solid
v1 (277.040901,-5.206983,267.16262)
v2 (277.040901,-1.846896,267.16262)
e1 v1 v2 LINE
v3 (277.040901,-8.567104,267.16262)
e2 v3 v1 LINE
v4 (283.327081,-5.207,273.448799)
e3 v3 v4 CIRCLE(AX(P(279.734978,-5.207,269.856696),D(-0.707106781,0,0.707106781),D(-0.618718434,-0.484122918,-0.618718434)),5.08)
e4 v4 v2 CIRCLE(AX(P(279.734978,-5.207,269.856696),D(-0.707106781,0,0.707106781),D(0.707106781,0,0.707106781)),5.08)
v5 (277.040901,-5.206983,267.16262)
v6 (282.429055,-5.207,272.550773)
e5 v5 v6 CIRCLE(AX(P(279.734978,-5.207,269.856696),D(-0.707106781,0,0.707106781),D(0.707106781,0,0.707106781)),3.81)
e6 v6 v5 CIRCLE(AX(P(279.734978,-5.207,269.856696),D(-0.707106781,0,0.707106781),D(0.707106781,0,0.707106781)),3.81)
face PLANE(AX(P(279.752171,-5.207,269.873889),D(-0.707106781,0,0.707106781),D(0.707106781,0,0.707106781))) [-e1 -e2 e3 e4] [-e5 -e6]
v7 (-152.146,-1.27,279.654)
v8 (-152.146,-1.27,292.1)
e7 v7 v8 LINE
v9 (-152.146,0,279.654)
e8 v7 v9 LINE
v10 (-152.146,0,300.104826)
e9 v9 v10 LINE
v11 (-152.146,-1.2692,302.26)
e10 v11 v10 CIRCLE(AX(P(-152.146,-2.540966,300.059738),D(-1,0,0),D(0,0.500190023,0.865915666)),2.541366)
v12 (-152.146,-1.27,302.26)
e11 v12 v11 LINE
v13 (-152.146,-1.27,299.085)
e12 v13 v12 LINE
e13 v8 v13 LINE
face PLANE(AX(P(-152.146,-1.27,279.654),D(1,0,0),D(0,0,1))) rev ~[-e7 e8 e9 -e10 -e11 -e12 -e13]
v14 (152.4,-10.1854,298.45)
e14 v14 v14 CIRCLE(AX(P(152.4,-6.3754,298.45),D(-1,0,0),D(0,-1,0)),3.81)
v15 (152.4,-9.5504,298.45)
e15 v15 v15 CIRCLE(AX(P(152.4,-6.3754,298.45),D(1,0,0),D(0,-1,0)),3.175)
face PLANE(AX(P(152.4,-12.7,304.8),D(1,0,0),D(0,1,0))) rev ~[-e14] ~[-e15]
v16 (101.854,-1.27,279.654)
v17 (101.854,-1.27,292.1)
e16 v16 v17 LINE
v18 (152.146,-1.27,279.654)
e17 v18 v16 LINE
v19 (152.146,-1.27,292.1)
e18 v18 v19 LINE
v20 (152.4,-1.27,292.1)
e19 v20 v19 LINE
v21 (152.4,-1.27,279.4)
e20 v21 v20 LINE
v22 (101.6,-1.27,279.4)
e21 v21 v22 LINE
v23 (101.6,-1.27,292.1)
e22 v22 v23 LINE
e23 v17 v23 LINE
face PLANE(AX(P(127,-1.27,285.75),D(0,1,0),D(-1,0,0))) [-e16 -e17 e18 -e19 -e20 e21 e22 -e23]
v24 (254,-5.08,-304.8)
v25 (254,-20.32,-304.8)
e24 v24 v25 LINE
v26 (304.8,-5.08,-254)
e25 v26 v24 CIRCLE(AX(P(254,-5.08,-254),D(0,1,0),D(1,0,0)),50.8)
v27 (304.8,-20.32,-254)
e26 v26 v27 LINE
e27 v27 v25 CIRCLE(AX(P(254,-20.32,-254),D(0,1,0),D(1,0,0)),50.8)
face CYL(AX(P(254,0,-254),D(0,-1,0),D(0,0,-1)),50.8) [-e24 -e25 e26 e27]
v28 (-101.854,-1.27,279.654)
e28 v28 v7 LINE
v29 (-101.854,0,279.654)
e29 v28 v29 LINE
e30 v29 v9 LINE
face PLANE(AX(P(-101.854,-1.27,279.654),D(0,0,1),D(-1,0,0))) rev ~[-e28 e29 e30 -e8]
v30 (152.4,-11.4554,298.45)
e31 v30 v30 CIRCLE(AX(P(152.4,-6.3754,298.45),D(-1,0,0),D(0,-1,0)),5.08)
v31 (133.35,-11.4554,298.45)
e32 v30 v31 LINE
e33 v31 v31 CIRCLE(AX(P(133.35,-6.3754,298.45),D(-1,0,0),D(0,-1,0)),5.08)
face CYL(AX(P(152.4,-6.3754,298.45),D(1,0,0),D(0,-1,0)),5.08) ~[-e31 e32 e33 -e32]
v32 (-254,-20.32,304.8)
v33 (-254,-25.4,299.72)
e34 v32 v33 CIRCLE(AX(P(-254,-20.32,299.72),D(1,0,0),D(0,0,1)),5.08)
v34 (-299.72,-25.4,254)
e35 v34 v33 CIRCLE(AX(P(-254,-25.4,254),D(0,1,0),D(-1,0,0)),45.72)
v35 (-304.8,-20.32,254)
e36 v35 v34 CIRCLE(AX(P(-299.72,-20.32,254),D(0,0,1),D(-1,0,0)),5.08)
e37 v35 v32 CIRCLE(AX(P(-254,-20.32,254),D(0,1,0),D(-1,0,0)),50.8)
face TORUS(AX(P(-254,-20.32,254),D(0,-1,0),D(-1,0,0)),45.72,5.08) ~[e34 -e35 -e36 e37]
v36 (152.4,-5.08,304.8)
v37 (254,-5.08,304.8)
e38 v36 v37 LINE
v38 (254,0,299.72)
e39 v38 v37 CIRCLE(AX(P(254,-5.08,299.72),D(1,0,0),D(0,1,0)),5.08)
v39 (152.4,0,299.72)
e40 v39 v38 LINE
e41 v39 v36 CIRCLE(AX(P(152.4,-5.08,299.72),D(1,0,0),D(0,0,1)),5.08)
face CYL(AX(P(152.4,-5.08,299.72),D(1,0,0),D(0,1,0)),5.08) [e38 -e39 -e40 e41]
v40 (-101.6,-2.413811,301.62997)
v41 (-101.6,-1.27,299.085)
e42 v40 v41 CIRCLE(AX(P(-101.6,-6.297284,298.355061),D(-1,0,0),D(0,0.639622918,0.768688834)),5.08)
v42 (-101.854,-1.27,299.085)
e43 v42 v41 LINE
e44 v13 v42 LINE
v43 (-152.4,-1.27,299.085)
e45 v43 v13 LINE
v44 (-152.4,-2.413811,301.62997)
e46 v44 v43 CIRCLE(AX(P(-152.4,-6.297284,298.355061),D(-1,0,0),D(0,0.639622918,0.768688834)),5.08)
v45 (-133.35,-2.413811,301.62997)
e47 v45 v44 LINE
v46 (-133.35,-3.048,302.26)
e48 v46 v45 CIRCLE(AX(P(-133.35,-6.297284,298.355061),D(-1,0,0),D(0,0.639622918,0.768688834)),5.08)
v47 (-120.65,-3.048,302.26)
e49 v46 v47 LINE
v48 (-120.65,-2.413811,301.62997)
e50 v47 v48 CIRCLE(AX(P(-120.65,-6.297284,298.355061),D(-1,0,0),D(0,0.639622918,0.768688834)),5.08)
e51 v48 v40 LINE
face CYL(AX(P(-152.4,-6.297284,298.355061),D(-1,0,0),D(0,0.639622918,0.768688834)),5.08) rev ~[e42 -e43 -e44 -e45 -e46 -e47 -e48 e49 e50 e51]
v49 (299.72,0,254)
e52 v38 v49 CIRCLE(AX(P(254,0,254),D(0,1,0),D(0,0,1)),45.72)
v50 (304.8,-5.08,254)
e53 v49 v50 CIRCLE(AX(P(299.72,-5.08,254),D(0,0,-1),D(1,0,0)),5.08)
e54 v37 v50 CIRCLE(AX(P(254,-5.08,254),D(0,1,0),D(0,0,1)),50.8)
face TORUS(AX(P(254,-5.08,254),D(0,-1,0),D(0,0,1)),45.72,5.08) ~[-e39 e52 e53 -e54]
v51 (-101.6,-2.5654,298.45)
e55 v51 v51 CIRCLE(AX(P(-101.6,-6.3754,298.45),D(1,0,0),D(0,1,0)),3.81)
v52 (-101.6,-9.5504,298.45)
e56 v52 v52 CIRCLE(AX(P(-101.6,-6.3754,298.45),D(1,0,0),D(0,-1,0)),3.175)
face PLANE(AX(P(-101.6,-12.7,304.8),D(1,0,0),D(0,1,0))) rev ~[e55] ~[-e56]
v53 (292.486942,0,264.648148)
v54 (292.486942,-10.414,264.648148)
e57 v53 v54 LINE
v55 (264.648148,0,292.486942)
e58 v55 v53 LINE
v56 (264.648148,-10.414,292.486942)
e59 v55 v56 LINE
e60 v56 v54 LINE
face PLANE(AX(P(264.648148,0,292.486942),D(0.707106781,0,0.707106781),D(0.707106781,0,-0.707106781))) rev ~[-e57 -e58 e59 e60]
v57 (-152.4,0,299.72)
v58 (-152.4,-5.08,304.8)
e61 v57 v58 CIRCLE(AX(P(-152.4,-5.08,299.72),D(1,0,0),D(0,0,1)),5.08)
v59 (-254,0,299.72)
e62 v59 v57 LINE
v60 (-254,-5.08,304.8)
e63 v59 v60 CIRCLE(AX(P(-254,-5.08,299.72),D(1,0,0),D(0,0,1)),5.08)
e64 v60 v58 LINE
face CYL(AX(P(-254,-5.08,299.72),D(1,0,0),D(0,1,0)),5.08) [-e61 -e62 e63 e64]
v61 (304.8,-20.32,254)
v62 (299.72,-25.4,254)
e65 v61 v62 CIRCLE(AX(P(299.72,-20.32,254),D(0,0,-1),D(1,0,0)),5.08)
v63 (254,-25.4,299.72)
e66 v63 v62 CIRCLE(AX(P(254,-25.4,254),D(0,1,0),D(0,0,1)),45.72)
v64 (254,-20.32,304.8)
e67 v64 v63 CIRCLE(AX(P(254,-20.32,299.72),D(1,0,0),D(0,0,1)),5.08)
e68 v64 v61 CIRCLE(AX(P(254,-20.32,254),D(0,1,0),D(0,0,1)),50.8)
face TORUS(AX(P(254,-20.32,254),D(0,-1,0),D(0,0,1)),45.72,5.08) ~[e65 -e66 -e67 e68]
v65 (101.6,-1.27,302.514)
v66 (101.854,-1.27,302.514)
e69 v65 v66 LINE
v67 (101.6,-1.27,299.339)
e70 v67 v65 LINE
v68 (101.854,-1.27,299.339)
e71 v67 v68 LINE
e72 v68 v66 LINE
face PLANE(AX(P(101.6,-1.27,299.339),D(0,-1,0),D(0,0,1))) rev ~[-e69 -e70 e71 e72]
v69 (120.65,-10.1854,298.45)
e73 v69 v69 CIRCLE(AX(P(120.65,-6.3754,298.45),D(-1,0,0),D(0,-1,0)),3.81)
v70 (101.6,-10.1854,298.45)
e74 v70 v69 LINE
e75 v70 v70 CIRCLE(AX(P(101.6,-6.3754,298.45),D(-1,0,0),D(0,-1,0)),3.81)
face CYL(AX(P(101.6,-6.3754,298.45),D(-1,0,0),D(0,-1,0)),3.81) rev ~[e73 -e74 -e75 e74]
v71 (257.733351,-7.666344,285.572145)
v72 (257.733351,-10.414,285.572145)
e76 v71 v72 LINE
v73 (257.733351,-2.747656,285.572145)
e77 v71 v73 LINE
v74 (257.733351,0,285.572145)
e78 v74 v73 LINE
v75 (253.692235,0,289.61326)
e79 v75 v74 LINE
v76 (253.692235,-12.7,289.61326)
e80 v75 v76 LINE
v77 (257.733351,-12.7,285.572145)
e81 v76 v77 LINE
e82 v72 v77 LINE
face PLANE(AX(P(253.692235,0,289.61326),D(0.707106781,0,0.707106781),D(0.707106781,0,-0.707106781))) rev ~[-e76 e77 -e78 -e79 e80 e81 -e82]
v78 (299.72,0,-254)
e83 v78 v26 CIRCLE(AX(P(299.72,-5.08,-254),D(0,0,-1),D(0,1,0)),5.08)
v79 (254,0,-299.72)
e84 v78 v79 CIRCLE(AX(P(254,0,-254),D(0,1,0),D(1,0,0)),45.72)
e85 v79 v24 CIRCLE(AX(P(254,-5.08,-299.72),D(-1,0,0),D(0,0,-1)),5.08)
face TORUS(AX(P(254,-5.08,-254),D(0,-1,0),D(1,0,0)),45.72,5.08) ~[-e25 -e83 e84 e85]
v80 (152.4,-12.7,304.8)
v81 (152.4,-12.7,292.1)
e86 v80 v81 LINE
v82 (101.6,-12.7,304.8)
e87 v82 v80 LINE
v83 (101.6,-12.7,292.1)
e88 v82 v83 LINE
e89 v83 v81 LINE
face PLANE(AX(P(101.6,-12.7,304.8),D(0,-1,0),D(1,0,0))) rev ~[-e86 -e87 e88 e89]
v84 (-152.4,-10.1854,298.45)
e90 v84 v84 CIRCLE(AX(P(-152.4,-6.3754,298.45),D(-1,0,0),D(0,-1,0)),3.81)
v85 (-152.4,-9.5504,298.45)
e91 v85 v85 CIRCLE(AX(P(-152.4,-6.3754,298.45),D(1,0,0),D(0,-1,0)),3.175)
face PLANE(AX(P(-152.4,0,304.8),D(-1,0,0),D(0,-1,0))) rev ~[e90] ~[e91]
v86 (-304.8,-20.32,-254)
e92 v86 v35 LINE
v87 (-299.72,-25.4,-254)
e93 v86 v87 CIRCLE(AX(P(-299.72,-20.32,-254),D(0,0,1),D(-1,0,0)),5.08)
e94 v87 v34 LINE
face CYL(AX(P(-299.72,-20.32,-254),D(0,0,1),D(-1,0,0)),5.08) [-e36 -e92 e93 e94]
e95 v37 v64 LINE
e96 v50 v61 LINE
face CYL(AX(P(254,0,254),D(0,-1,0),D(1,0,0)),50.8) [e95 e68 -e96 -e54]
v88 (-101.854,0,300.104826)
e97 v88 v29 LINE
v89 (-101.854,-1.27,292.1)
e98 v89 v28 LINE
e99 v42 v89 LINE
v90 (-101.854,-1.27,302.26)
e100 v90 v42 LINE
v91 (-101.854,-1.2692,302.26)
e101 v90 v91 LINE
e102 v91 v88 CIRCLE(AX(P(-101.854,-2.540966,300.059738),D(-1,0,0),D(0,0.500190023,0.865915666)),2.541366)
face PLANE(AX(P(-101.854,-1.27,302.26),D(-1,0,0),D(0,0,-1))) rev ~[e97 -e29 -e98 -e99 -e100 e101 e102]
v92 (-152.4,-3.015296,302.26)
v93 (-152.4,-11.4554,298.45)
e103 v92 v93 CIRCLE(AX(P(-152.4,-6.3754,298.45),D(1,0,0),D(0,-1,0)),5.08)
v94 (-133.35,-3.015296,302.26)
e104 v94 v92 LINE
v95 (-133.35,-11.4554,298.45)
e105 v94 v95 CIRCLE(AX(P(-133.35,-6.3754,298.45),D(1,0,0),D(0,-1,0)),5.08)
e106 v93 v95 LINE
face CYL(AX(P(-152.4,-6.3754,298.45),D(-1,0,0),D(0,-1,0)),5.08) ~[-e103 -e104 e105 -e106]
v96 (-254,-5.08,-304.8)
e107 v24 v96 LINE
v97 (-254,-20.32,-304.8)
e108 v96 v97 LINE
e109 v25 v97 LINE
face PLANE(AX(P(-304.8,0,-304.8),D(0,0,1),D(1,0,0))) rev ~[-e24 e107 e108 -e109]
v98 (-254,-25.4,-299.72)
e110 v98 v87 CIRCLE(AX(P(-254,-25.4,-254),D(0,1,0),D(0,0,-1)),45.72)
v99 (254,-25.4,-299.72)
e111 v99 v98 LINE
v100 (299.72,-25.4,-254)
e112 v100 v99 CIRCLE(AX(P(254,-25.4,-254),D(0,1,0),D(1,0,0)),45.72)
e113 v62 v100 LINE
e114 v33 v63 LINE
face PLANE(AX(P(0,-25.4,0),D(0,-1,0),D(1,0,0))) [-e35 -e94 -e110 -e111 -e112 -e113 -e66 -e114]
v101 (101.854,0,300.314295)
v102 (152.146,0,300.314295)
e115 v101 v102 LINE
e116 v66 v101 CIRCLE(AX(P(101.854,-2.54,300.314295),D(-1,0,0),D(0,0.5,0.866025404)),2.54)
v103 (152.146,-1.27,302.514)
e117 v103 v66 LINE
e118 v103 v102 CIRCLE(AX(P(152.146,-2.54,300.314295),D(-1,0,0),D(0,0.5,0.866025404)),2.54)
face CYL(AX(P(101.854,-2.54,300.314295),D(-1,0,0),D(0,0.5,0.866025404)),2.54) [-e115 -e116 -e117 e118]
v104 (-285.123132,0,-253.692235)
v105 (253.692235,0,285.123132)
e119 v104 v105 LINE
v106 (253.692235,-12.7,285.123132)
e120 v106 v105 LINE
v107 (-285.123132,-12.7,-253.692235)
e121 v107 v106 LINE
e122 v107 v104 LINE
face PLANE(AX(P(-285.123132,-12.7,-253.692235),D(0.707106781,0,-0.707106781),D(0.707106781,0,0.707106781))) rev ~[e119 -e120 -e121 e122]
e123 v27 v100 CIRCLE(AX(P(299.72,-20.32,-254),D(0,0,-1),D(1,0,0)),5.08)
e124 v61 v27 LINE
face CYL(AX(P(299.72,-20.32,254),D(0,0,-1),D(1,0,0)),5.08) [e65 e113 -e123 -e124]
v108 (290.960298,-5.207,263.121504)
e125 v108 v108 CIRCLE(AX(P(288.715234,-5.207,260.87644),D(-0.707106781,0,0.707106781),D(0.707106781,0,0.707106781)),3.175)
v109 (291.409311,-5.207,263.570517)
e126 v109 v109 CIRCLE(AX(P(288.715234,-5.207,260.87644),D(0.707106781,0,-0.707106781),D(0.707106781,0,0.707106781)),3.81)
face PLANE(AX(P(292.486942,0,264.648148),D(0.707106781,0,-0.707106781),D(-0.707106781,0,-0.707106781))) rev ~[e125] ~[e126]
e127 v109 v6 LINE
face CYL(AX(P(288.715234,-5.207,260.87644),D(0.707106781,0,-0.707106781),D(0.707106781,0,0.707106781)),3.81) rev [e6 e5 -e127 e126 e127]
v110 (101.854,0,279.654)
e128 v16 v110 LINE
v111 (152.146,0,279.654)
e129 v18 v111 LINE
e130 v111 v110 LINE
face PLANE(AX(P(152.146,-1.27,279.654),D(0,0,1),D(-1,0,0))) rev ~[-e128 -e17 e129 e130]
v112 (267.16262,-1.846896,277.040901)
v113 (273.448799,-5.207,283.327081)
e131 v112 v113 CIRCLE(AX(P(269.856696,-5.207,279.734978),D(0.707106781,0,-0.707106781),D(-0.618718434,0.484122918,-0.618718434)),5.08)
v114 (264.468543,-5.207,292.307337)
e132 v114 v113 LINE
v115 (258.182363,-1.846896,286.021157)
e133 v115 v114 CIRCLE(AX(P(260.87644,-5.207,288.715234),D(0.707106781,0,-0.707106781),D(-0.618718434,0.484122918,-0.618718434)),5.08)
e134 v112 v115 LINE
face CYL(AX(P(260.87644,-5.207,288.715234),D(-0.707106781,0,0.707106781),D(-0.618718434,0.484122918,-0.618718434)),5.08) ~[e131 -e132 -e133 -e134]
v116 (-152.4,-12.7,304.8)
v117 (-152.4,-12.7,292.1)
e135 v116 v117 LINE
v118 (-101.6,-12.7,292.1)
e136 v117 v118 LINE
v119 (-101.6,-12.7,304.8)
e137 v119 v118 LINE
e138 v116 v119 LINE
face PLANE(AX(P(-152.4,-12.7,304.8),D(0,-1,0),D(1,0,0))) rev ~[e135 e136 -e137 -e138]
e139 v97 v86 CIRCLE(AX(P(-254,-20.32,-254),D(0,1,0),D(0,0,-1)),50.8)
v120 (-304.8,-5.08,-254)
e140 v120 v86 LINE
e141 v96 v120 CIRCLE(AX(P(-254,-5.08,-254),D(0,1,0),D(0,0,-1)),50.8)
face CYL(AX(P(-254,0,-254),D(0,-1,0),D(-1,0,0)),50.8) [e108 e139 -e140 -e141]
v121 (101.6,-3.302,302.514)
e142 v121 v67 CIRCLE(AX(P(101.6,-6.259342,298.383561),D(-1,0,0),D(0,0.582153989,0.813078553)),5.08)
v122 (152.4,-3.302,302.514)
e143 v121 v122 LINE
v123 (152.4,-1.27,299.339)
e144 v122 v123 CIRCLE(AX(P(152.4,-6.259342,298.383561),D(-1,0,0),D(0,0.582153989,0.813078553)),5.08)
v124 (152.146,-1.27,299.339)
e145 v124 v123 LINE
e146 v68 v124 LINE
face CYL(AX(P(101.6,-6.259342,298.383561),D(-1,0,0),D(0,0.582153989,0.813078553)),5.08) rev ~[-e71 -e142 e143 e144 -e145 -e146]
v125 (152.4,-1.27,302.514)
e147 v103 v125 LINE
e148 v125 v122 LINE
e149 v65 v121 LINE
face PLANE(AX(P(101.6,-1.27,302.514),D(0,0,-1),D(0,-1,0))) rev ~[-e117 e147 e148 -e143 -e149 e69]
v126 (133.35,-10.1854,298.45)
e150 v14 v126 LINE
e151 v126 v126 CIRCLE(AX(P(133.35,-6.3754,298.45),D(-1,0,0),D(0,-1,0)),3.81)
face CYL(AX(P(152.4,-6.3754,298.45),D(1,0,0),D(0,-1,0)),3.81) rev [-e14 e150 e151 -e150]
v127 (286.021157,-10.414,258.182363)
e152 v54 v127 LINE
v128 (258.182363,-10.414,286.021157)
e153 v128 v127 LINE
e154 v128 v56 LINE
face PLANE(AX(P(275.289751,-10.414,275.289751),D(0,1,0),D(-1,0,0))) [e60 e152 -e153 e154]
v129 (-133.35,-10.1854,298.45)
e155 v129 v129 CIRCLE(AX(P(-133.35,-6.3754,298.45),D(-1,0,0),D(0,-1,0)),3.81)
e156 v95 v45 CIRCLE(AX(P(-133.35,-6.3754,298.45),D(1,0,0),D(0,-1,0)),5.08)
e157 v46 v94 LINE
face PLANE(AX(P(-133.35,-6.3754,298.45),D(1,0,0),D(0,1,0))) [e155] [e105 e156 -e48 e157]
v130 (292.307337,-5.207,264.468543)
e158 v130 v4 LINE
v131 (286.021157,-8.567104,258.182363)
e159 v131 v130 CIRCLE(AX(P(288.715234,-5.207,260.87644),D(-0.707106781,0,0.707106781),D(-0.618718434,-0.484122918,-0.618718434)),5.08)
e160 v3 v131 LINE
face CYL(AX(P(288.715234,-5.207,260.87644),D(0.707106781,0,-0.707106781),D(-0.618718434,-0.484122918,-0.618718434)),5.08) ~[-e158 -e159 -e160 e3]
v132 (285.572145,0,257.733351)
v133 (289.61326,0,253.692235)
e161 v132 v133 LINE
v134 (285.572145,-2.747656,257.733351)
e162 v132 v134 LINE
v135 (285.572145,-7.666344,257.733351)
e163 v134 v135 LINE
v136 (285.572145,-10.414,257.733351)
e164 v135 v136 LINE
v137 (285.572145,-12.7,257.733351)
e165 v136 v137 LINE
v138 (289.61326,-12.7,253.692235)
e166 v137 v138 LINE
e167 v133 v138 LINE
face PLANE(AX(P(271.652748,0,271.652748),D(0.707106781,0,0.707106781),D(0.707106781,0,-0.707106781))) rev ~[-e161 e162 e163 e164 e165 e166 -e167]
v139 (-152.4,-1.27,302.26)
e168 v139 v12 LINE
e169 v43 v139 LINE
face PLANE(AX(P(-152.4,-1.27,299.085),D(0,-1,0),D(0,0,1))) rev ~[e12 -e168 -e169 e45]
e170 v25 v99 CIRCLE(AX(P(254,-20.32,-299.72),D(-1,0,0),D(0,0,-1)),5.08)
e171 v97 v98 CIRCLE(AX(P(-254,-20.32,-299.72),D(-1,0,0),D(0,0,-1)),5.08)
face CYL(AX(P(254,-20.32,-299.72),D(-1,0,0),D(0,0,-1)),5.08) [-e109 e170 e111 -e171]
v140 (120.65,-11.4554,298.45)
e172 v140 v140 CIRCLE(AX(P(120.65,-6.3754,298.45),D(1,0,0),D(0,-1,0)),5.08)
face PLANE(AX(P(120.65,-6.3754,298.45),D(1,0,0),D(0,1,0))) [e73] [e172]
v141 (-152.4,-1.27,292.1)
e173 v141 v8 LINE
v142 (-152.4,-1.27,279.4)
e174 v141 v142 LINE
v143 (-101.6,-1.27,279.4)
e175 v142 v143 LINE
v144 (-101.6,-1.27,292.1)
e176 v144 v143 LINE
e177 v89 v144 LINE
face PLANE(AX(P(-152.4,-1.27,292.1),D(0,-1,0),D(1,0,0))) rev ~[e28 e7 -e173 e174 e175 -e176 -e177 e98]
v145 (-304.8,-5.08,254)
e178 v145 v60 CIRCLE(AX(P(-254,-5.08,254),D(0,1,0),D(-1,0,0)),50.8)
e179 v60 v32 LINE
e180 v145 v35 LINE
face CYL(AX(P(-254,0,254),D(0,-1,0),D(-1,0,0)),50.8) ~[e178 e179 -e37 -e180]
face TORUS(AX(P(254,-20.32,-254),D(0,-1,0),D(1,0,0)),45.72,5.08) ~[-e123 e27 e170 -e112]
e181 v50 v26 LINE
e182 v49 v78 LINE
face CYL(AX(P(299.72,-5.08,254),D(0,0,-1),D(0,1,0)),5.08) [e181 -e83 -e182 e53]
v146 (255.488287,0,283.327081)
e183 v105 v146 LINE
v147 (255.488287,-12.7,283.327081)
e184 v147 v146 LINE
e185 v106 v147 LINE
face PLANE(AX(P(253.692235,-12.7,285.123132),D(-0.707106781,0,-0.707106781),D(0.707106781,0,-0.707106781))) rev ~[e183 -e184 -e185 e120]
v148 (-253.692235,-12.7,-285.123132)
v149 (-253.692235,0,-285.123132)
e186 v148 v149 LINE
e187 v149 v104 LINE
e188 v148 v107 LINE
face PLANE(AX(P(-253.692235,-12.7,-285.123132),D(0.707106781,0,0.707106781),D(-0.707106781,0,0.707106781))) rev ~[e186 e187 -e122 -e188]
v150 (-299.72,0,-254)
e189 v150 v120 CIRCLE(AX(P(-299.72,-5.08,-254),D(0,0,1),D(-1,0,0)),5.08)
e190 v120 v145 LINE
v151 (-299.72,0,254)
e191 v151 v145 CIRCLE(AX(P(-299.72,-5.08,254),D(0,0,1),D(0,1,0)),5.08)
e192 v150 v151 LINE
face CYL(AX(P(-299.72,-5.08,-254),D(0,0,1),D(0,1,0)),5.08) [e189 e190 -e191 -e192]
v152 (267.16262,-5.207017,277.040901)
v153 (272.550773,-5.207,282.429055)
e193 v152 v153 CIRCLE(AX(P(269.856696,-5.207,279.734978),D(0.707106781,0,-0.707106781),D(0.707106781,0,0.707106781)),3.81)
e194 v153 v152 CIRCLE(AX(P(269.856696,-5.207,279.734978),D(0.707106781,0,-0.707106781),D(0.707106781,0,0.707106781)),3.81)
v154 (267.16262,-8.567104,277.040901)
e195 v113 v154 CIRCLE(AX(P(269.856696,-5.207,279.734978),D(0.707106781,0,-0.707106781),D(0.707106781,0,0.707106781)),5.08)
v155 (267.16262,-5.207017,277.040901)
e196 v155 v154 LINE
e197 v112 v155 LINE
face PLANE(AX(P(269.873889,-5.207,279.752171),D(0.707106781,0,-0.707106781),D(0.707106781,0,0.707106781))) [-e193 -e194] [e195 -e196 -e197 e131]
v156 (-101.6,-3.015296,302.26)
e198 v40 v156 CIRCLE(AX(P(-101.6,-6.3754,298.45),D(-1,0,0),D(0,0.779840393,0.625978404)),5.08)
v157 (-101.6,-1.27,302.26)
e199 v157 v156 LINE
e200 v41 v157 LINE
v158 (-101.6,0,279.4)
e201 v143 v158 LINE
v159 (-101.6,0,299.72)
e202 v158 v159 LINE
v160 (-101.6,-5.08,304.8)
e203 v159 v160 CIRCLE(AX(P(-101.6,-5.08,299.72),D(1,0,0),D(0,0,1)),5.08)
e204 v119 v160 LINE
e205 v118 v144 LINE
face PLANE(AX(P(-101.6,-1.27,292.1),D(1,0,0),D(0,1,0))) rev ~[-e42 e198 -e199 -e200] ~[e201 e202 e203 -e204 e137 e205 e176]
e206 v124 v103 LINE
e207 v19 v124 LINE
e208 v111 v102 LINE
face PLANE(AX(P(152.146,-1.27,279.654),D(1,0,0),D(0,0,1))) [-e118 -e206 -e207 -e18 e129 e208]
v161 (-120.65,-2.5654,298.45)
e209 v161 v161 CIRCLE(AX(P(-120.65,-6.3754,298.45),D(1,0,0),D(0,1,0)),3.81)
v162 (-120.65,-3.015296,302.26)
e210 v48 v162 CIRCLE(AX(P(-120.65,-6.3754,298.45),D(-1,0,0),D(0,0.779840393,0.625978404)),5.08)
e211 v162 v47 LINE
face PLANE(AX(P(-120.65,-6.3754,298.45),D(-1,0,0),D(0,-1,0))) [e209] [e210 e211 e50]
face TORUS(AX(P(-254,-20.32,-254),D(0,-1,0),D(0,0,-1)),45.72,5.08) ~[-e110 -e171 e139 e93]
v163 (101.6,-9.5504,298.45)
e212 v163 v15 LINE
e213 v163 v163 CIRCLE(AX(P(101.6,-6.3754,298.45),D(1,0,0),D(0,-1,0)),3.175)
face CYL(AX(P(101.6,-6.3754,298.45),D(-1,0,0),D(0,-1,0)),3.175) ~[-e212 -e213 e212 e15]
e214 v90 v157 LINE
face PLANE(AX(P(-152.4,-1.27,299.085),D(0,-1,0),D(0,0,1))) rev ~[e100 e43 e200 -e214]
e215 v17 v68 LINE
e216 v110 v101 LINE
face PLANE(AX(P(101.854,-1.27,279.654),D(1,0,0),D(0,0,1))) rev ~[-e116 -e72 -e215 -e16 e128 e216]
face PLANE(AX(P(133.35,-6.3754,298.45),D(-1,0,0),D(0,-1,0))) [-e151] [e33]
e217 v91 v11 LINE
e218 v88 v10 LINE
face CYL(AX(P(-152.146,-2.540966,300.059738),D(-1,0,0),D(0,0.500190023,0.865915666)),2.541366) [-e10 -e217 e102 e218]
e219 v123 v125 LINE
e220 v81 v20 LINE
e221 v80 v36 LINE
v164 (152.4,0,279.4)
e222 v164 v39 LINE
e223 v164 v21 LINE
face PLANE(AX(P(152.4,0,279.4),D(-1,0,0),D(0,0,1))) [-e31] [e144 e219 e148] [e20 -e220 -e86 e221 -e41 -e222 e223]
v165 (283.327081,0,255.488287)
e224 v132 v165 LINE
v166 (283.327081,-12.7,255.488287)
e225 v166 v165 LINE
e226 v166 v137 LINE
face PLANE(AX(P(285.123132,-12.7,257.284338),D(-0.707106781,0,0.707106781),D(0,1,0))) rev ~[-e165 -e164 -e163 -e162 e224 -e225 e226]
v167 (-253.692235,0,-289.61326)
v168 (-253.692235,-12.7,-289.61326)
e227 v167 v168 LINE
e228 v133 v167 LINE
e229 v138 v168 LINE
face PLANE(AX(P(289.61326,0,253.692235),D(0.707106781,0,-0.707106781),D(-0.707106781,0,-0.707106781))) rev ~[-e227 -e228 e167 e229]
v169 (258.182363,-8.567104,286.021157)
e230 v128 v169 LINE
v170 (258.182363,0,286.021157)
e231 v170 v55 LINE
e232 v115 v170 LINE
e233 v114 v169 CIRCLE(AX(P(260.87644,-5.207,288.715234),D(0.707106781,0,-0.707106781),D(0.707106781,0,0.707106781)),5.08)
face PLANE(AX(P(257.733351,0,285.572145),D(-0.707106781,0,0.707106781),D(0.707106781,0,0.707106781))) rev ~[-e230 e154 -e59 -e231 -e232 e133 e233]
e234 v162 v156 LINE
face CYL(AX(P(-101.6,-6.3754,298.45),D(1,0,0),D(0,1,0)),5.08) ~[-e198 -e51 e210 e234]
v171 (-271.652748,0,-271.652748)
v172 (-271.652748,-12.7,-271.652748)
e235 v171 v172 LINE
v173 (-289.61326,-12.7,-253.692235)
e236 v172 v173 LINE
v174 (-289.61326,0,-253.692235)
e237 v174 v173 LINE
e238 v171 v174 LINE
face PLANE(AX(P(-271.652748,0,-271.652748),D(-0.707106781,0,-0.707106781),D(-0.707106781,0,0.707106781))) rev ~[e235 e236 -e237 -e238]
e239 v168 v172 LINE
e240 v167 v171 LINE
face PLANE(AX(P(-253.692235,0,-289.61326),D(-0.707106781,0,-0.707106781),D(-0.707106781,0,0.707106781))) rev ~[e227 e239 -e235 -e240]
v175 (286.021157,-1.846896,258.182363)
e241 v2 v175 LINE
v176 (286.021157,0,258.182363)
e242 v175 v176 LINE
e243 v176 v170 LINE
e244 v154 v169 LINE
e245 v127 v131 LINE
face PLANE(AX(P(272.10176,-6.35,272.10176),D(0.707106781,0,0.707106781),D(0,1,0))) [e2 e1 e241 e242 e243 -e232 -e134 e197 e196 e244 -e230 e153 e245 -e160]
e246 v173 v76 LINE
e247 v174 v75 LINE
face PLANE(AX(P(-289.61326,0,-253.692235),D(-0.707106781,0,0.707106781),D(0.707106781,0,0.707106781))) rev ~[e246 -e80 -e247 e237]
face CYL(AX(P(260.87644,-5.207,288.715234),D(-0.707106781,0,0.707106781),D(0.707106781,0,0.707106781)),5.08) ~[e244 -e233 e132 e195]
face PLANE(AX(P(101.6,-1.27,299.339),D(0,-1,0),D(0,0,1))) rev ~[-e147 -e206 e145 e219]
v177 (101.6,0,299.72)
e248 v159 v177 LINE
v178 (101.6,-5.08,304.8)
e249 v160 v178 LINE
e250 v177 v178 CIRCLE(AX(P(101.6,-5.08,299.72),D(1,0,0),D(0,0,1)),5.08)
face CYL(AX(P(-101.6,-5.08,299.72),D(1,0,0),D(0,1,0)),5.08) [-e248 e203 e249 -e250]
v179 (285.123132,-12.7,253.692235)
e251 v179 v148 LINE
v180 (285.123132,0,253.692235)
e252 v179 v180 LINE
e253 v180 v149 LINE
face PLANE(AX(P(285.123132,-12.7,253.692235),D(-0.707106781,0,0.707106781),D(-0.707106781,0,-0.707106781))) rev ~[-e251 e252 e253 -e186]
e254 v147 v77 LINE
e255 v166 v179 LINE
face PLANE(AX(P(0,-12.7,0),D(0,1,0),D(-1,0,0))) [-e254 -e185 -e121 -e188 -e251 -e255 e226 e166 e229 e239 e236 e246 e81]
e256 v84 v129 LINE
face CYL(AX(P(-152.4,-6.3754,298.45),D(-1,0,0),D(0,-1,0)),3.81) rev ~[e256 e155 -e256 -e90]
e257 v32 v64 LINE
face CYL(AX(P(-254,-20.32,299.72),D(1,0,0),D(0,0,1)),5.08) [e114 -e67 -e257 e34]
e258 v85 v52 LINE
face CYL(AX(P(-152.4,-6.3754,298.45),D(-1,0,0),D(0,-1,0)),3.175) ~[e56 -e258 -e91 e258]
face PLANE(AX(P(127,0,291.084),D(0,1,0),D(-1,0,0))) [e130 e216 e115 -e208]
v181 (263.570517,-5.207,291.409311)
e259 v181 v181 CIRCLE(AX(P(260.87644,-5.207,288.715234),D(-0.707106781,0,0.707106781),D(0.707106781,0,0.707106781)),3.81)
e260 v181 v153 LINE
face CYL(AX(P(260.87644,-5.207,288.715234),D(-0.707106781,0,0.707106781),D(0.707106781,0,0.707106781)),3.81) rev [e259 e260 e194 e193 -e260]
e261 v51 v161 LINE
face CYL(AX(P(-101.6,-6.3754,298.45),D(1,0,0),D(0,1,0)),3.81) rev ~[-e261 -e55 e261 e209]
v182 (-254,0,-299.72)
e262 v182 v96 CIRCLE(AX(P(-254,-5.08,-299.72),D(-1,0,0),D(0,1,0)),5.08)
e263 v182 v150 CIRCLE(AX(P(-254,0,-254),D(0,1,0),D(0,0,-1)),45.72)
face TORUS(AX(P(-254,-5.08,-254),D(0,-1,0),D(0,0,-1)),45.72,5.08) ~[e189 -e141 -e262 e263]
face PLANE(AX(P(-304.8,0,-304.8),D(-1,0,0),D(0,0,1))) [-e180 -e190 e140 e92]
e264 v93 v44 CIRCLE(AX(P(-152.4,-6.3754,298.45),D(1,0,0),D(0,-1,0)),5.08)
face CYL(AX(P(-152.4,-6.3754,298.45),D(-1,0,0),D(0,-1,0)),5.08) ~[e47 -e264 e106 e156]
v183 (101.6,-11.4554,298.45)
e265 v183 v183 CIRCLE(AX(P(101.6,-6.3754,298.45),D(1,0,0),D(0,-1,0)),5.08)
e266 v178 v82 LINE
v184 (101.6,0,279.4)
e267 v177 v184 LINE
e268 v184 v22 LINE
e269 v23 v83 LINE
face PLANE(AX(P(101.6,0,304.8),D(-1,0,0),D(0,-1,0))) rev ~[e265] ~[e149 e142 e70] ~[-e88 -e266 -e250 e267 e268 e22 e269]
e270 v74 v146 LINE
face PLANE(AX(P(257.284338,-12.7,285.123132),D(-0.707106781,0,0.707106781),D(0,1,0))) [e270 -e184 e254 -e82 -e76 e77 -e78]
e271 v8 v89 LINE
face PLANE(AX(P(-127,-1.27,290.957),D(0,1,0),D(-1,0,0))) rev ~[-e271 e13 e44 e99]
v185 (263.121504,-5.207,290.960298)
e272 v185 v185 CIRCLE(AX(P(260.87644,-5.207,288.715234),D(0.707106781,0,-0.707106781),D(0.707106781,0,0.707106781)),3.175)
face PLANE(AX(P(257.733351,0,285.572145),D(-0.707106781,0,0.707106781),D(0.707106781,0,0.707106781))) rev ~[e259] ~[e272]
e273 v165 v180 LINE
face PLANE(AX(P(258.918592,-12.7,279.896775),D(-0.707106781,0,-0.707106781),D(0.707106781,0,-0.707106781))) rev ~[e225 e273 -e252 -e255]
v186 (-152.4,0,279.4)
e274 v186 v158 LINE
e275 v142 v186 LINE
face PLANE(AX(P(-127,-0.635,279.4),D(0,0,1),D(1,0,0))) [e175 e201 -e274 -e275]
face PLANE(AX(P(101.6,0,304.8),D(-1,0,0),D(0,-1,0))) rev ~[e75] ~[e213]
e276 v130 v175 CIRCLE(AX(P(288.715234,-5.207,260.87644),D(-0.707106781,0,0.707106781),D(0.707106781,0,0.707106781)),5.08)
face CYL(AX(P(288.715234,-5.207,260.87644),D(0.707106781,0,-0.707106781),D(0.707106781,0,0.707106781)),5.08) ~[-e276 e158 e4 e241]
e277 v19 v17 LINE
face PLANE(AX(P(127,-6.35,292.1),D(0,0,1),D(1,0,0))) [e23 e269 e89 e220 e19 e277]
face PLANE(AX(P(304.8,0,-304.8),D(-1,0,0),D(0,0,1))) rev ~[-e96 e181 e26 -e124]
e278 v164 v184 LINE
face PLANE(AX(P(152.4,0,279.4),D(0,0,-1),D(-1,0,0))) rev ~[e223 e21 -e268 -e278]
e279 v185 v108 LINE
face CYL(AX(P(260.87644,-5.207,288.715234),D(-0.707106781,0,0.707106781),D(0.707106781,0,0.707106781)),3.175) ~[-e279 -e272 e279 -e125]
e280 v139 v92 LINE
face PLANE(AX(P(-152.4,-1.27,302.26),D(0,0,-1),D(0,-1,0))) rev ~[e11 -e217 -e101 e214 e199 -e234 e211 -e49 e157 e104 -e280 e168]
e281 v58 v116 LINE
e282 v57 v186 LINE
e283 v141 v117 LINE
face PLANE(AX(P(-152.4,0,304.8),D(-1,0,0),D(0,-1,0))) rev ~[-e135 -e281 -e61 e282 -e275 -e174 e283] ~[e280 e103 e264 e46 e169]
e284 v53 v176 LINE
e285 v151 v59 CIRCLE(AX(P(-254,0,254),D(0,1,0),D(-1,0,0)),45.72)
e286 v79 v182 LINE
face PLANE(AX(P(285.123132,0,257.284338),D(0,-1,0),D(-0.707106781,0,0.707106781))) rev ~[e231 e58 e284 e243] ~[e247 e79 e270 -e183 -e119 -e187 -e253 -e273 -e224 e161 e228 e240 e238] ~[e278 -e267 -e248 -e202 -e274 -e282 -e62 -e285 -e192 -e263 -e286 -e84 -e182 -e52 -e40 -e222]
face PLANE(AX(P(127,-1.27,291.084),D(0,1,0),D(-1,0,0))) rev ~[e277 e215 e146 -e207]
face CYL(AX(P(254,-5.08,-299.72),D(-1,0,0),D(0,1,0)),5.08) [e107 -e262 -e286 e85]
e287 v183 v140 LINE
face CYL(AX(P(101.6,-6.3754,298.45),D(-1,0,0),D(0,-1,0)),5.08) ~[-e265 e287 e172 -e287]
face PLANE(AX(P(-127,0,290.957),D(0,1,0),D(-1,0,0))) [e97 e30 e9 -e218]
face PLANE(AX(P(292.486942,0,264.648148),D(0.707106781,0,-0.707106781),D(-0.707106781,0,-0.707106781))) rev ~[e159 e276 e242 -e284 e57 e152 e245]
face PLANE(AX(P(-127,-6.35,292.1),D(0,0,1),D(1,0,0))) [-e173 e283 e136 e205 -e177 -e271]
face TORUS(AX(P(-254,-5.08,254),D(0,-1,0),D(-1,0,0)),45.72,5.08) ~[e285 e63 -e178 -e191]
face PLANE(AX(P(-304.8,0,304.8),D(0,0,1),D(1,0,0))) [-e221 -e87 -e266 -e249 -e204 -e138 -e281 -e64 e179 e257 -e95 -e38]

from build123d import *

# Parameters (mm, degrees)
F0_W         = 609.6
F0_H         = 609.6
F1_DEPTH     = 25.4
F2_R         = 50.8
F4_DEPTH     = 12.7
F6_DEPTH     = 50.8
F7_DEPTH     = 19.05
F9_DEPTH     = 19.05
F10_W        = 50.8
F10_H        = 1.27
F11_DEPTH    = 12.7
F13_DEPTH    = 1.27
F14_T1_DEPTH = 50.292
F15_R        = 5.08
F17_DEPTH    = 50.8
F18_DEPTH    = 19.05
F19_R        = 5.08
F19_R_2      = 3.81
F20_DEPTH    = 19.05
F21_W        = 50.8
F21_H        = 12.7
F22_DEPTH    = 1.27
F23_W        = 50.292
F23_H        = 22.86
F24_DEPTH    = 1.27
F25_T1_DEPTH = 50.292
F27_DEPTH    = 50.8
F29_DEPTH    = 50.8
F31_DEPTH    = 12.7
F33_DEPTH    = 12.7
F34_W        = 12.7
F34_H        = 39.37
F35_DEPTH    = 2.54
F37_DEPTH    = 10.414
F38_R        = 3.175
F39_DEPTH    = 50.8
F40_R        = 3.81
F41_DEPTH    = 12.7
F38_R_2      = 3.81
F42_DEPTH    = 12.7
F43_DEPTH    = 1.27


# Not quite as in the source:
# - a fillet or chamfer that OpenCascade refuses, or shapes differently, is made with other operations: its cross-section is extruded or revolved along the edge and cut away or added


with BuildPart() as f1:
    # F0 (on Front) → F1 (new body)
    with BuildSketch(Plane.XZ):
        Rectangle(F0_W, F0_H)
    extrude(amount=F1_DEPTH)

    # F2
    f2_edges = [f1.edges().sort_by_distance(p)[0] for p in [
        (304.8, -12.7, 304.8),
        (-304.8, -12.7, 304.8),
        (-304.8, -12.7, -304.8),
        (304.8, -12.7, -304.8),
    ]]
    fillet(f2_edges, radius=F2_R)

    # F3 (on face) → F4 (cut)
    with BuildSketch(Plane.XY.offset(304.8)):
        Polygon((-101.6, -12.7), (-101.6, 0), (-127, 0), (-152.4, 0), (-152.4, -12.7), align=None)
        Polygon((127, 0), (101.6, 0), (101.6, -12.7), (152.4, -12.7), (152.4, 0), align=None)
    extrude(amount=-F4_DEPTH, mode=Mode.SUBTRACT)

    # F5 (on face) → F6 (join)
    with BuildSketch(Plane.YZ.offset(-152.4)):
        with BuildLine():
            ThreePointArc((-3.2004, 298.45), (-6.3754, 301.625), (-9.5504, 298.45))
            ThreePointArc((-9.5504, 298.45), (-6.3754, 295.275), (-3.2004, 298.45))
        make_face()
    extrude(amount=F6_DEPTH)

    # F5 (on face) → F7 (join)
    with BuildSketch(Plane.YZ.offset(-152.4)):
        with BuildLine():
            ThreePointArc((-1.2954, 298.45), (-6.3754, 303.53), (-11.4554, 298.45))
            ThreePointArc((-11.4554, 298.45), (-6.3754, 293.37), (-1.2954, 298.45))
        make_face()
        with BuildLine():
            ThreePointArc((-2.5654, 298.45), (-6.3754, 294.64), (-10.1854, 298.45))
            ThreePointArc((-10.1854, 298.45), (-6.3754, 302.26), (-2.5654, 298.45))
        make_face(mode=Mode.SUBTRACT)
    extrude(amount=F7_DEPTH)

    # F8 (on face) → F9 (join)
    with BuildSketch(Plane(origin=(-101.6, 0, 0), x_dir=(0, -1, 0), z_dir=(-1, 0, 0))):
        with BuildLine():
            ThreePointArc((11.4554, 298.45), (6.3754, 303.53), (1.2954, 298.45))
            ThreePointArc((1.2954, 298.45), (6.3754, 293.37), (11.4554, 298.45))
        make_face()
        with BuildLine():
            ThreePointArc((10.1854, 298.45), (6.3754, 294.64), (2.5654, 298.45))
            ThreePointArc((2.5654, 298.45), (6.3754, 302.26), (10.1854, 298.45))
        make_face(mode=Mode.SUBTRACT)
    extrude(amount=F9_DEPTH)

    # F10 (on face) → F11 (cut)
    with BuildSketch(Plane.XY.offset(292.1)):
        with Locations((-127, -0.635)):
            Rectangle(F10_W, F10_H)
    extrude(amount=-F11_DEPTH, mode=Mode.SUBTRACT)

    # F12 (on face) → F13 (join)
    with BuildSketch(Plane(origin=(0, -1.27, 0), x_dir=(-1, 0, 0), z_dir=(0, 1, 0))):
        Polygon((101.854, 302.26), (101.854, 279.654), (127.4700760841, 279.654), (152.146, 279.654), (152.146, 302.26), align=None)
    extrude(amount=F13_DEPTH)

    # F14: fillet of radius 2.54 on 1 edges, made by hand

    # F14_s2 → F14_t1 (cut)
    with BuildSketch(Plane.YZ.offset(-152.146)):
        with BuildLine():
            ThreePointArc((-1.269799924, 302.2603463663), (-0.3399390393, 301.3301793667), (0.0004, 300.0597380063))
            Line((0.0004, 300.0597380063), (0.2545365685, 300.0597380063))
            ThreePointArc((0.2545365685, 300.0597380063), (0.2541365685, 301.1598690031), (0.2541365685, 302.26))
            Line((0.2541365685, 302.26), (0, 302.5141365685))
            ThreePointArc((0, 302.5141365685), (-0.634899962, 302.5141365685), (-1.1426833478, 302.4804072023))
            Line((-1.1426833478, 302.4804072023), (-1.269799924, 302.2603463663))
        make_face()
    extrude(amount=F14_T1_DEPTH, mode=Mode.SUBTRACT)

    # F15
    f15_edges = [f1.edges().sort_by_distance(p)[0] for p in [
        (-304.8, 0, 0),
        (-304.8, -25.4, 0),
        (-289.921024, -25.4, 289.921024),
        (-289.921024, 0, 289.921024),
        (0, 0, 304.8),
        (304.8, 0, 0),
        (304.8, -25.4, 0),
        (289.921024, 0, -289.921024),
        (289.921024, 0, 289.921024),
        (203.2, 0, 304.8),
        (-203.2, 0, 304.8),
        (-289.921024, 0, -289.921024),
        (0, 0, -304.8),
        (289.921024, -25.4, -289.921024),
        (289.921024, -25.4, 289.921024),
        (0, -25.4, -304.8),
        (0, -25.4, 304.8),
        (-289.921024, -25.4, -289.921024),
    ]]
    fillet(f15_edges, radius=F15_R)

    # F16 (on face) → F17 (join)
    with BuildSketch(Plane.YZ.offset(101.6)):
        with BuildLine():
            ThreePointArc((-3.2004, 298.45), (-6.3754, 301.625), (-9.5504, 298.45))
            ThreePointArc((-9.5504, 298.45), (-6.3754, 295.275), (-3.2004, 298.45))
        make_face()
    extrude(amount=F17_DEPTH)

    # F16 (on face) → F18 (join)
    with BuildSketch(Plane.YZ.offset(101.6)):
        with BuildLine():
            ThreePointArc((-1.2954, 298.45), (-6.3754, 303.53), (-11.4554, 298.45))
            ThreePointArc((-11.4554, 298.45), (-6.3754, 293.37), (-1.2954, 298.45))
        make_face()
        with BuildLine():
            ThreePointArc((-2.5654, 298.45), (-6.3754, 294.64), (-10.1854, 298.45))
            ThreePointArc((-10.1854, 298.45), (-6.3754, 302.26), (-2.5654, 298.45))
        make_face(mode=Mode.SUBTRACT)
    extrude(amount=F18_DEPTH)

    # F19 (on face) → F20 (join)
    with BuildSketch(Plane(origin=(152.4, 0, 0), x_dir=(0, -1, 0), z_dir=(-1, 0, 0))):
        with Locations((6.3754, 298.45)):
            Circle(F19_R)
        with Locations((6.3754, 298.45)):
            Circle(F19_R_2, mode=Mode.SUBTRACT)
    extrude(amount=F20_DEPTH)

    # F21 (on face) → F22 (cut)
    with BuildSketch(Plane(origin=(0, 0, 0), x_dir=(-1, 0, 0), z_dir=(0, 1, 0))):
        with Locations((-127, 285.75)):
            Rectangle(F21_W, F21_H)
    extrude(amount=-F22_DEPTH, mode=Mode.SUBTRACT)

    # F23 (on face) → F24 (join)
    with BuildSketch(Plane(origin=(0, -1.27, 0), x_dir=(-1, 0, 0), z_dir=(0, 1, 0))):
        with Locations((-127, 291.084)):
            Rectangle(F23_W, F23_H)
    extrude(amount=F24_DEPTH)

    # F25: fillet of radius 2.54 on 1 edges, made by hand

    # F25_s2 → F25_t1 (cut)
    with BuildSketch(Plane.YZ.offset(101.854)):
        with BuildLine():
            ThreePointArc((-1.27, 302.514), (-0.3402954744, 301.5842954744), (0, 300.3142954744))
            Line((0, 300.3142954744), (0, 302.514))
            Line((0, 302.514), (-1.27, 302.514))
        make_face()
    extrude(amount=F25_T1_DEPTH, mode=Mode.SUBTRACT)

    # F26 (on face) → F27 (join)
    with BuildSketch(Plane.YZ.offset(101.6)):
        with BuildLine():
            Line((-1.27, 299.339), (-1.27, 302.514))
            Line((-1.27, 302.514), (-3.302, 302.514))
            ThreePointArc((-3.302, 302.514), (-1.9806035483, 301.1219537291), (-1.27, 299.339))
        make_face()
    extrude(amount=F27_DEPTH)

    # F28 (on face) → F29 (join)
    with BuildSketch(Plane.YZ.offset(-152.4)):
        with BuildLine():
            Line((-1.27, 299.085), (-1.27, 302.26))
            Line((-1.27, 302.26), (-3.048, 302.26))
            ThreePointArc((-3.048, 302.26), (-1.8649538604, 300.8371658382), (-1.27, 299.085))
        make_face()
    extrude(amount=F29_DEPTH)

    # F30 (on face) → F31 (cut)
    with BuildSketch(Plane(origin=(0, 0, 0), x_dir=(-1, 0, 0), z_dir=(0, 1, 0))):
        Polygon((-253.6922354202, 289.6132599045), (-271.6527476623, 271.6527476623), (-289.6132599045, 253.6922354202), (253.6922354202, -289.6132599045), (271.6527476623, -271.6527476623), (289.6132599045, -253.6922354202), align=None)
    extrude(amount=-F31_DEPTH, mode=Mode.SUBTRACT)

    # F32 (on face) → F33 (join)
    with BuildSketch(Plane(origin=(0, -12.7, 0), x_dir=(-1, 0, 0), z_dir=(0, 1, 0))):
        Polygon((-250.3770757206, 281.8079721443), (-253.6922354202, 285.1231318439), (-258.918592355, 279.8967749092), (-285.1231318439, 253.6922354202), (-222.135802757, 190.7049063332), (253.6922354202, -285.1231318439), (270.6703651647, -268.1450020994), (285.1231318439, -253.6922354202), align=None)
    extrude(amount=F33_DEPTH)

    # F34 (on face) → F35 (join)
    with BuildSketch(Plane(origin=(269.4076836321, 0, 269.4076836321), x_dir=(0, 1, 0), z_dir=(0.7071067812, 0, 0.7071067812))):
        with Locations((-6.35, 0)):
            Rectangle(F34_W, F34_H)
    extrude(amount=F35_DEPTH)

    # F36 (on face) → F37 (cut)
    with BuildSketch(Plane(origin=(0, 0, 0), x_dir=(-1, 0, 0), z_dir=(0, 1, 0))):
        Polygon((-292.4869418632, 264.6481478879), (-285.9313548948, 258.0925609195), (-258.0925609195, 285.9313548948), (-264.6481478879, 292.4869418632), align=None)
        Polygon((-258.0925609195, 285.9313548948), (-285.9313548948, 258.0925609195), (-285.57214465, 257.7333506747), (-257.7333506747, 285.57214465), align=None)
    extrude(amount=-F37_DEPTH, mode=Mode.SUBTRACT)

    # F38 (on face) → F39 (join)
    with BuildSketch(Plane(origin=(-13.9193969877, 0, 13.9193969877), x_dir=(0.7071067812, 0, 0.7071067812), z_dir=(0.7071067812, 0, -0.7071067812))):
        with Locations((388.62, 5.207)):
            Circle(F38_R)
    extrude(amount=F39_DEPTH)

    # F40 (on face) → F41 (join)
    with BuildSketch(Plane(origin=(13.9193969877, 0, -13.9193969877), x_dir=(0.7071067812, 0, 0.7071067812), z_dir=(-0.7071067812, 0, 0.7071067812))):
        with BuildLine():
            ThreePointArc((384.175, -7.6663444248), (389.89, -10.1256888497), (393.7, -5.207))
            ThreePointArc((393.7, -5.207), (389.89, -0.2883111503), (384.175, -2.7476555752))
            Line((384.175, -2.7476555752), (384.175, -7.6663444248))
        make_face()
        with Locations((388.62, -5.207)):
            Circle(F40_R, mode=Mode.SUBTRACT)
    extrude(amount=F41_DEPTH)

    # F38 (on face) → F42 (join)
    with BuildSketch(Plane(origin=(-13.9193969877, 0, 13.9193969877), x_dir=(0.7071067812, 0, 0.7071067812), z_dir=(0.7071067812, 0, -0.7071067812))):
        with BuildLine():
            ThreePointArc((384.175, 2.7476555752), (389.89, 0.2883111503), (393.7, 5.207))
            ThreePointArc((393.7, 5.207), (389.89, 10.1256888497), (384.175, 7.6663444248))
            Line((384.175, 7.6663444248), (384.175, 2.7476555752))
        make_face()
        with Locations((388.62, 5.207)):
            Circle(F38_R_2, mode=Mode.SUBTRACT)
    extrude(amount=F42_DEPTH)

    # F43 (add): a face of the model
    f43_faces = [f1.faces().sort_by_distance(p)[0] for p in [
        (271.2037348563, -6.35, 271.2037348563),
    ]]
    extrude(f43_faces, amount=F43_DEPTH)


solid = f1.part
